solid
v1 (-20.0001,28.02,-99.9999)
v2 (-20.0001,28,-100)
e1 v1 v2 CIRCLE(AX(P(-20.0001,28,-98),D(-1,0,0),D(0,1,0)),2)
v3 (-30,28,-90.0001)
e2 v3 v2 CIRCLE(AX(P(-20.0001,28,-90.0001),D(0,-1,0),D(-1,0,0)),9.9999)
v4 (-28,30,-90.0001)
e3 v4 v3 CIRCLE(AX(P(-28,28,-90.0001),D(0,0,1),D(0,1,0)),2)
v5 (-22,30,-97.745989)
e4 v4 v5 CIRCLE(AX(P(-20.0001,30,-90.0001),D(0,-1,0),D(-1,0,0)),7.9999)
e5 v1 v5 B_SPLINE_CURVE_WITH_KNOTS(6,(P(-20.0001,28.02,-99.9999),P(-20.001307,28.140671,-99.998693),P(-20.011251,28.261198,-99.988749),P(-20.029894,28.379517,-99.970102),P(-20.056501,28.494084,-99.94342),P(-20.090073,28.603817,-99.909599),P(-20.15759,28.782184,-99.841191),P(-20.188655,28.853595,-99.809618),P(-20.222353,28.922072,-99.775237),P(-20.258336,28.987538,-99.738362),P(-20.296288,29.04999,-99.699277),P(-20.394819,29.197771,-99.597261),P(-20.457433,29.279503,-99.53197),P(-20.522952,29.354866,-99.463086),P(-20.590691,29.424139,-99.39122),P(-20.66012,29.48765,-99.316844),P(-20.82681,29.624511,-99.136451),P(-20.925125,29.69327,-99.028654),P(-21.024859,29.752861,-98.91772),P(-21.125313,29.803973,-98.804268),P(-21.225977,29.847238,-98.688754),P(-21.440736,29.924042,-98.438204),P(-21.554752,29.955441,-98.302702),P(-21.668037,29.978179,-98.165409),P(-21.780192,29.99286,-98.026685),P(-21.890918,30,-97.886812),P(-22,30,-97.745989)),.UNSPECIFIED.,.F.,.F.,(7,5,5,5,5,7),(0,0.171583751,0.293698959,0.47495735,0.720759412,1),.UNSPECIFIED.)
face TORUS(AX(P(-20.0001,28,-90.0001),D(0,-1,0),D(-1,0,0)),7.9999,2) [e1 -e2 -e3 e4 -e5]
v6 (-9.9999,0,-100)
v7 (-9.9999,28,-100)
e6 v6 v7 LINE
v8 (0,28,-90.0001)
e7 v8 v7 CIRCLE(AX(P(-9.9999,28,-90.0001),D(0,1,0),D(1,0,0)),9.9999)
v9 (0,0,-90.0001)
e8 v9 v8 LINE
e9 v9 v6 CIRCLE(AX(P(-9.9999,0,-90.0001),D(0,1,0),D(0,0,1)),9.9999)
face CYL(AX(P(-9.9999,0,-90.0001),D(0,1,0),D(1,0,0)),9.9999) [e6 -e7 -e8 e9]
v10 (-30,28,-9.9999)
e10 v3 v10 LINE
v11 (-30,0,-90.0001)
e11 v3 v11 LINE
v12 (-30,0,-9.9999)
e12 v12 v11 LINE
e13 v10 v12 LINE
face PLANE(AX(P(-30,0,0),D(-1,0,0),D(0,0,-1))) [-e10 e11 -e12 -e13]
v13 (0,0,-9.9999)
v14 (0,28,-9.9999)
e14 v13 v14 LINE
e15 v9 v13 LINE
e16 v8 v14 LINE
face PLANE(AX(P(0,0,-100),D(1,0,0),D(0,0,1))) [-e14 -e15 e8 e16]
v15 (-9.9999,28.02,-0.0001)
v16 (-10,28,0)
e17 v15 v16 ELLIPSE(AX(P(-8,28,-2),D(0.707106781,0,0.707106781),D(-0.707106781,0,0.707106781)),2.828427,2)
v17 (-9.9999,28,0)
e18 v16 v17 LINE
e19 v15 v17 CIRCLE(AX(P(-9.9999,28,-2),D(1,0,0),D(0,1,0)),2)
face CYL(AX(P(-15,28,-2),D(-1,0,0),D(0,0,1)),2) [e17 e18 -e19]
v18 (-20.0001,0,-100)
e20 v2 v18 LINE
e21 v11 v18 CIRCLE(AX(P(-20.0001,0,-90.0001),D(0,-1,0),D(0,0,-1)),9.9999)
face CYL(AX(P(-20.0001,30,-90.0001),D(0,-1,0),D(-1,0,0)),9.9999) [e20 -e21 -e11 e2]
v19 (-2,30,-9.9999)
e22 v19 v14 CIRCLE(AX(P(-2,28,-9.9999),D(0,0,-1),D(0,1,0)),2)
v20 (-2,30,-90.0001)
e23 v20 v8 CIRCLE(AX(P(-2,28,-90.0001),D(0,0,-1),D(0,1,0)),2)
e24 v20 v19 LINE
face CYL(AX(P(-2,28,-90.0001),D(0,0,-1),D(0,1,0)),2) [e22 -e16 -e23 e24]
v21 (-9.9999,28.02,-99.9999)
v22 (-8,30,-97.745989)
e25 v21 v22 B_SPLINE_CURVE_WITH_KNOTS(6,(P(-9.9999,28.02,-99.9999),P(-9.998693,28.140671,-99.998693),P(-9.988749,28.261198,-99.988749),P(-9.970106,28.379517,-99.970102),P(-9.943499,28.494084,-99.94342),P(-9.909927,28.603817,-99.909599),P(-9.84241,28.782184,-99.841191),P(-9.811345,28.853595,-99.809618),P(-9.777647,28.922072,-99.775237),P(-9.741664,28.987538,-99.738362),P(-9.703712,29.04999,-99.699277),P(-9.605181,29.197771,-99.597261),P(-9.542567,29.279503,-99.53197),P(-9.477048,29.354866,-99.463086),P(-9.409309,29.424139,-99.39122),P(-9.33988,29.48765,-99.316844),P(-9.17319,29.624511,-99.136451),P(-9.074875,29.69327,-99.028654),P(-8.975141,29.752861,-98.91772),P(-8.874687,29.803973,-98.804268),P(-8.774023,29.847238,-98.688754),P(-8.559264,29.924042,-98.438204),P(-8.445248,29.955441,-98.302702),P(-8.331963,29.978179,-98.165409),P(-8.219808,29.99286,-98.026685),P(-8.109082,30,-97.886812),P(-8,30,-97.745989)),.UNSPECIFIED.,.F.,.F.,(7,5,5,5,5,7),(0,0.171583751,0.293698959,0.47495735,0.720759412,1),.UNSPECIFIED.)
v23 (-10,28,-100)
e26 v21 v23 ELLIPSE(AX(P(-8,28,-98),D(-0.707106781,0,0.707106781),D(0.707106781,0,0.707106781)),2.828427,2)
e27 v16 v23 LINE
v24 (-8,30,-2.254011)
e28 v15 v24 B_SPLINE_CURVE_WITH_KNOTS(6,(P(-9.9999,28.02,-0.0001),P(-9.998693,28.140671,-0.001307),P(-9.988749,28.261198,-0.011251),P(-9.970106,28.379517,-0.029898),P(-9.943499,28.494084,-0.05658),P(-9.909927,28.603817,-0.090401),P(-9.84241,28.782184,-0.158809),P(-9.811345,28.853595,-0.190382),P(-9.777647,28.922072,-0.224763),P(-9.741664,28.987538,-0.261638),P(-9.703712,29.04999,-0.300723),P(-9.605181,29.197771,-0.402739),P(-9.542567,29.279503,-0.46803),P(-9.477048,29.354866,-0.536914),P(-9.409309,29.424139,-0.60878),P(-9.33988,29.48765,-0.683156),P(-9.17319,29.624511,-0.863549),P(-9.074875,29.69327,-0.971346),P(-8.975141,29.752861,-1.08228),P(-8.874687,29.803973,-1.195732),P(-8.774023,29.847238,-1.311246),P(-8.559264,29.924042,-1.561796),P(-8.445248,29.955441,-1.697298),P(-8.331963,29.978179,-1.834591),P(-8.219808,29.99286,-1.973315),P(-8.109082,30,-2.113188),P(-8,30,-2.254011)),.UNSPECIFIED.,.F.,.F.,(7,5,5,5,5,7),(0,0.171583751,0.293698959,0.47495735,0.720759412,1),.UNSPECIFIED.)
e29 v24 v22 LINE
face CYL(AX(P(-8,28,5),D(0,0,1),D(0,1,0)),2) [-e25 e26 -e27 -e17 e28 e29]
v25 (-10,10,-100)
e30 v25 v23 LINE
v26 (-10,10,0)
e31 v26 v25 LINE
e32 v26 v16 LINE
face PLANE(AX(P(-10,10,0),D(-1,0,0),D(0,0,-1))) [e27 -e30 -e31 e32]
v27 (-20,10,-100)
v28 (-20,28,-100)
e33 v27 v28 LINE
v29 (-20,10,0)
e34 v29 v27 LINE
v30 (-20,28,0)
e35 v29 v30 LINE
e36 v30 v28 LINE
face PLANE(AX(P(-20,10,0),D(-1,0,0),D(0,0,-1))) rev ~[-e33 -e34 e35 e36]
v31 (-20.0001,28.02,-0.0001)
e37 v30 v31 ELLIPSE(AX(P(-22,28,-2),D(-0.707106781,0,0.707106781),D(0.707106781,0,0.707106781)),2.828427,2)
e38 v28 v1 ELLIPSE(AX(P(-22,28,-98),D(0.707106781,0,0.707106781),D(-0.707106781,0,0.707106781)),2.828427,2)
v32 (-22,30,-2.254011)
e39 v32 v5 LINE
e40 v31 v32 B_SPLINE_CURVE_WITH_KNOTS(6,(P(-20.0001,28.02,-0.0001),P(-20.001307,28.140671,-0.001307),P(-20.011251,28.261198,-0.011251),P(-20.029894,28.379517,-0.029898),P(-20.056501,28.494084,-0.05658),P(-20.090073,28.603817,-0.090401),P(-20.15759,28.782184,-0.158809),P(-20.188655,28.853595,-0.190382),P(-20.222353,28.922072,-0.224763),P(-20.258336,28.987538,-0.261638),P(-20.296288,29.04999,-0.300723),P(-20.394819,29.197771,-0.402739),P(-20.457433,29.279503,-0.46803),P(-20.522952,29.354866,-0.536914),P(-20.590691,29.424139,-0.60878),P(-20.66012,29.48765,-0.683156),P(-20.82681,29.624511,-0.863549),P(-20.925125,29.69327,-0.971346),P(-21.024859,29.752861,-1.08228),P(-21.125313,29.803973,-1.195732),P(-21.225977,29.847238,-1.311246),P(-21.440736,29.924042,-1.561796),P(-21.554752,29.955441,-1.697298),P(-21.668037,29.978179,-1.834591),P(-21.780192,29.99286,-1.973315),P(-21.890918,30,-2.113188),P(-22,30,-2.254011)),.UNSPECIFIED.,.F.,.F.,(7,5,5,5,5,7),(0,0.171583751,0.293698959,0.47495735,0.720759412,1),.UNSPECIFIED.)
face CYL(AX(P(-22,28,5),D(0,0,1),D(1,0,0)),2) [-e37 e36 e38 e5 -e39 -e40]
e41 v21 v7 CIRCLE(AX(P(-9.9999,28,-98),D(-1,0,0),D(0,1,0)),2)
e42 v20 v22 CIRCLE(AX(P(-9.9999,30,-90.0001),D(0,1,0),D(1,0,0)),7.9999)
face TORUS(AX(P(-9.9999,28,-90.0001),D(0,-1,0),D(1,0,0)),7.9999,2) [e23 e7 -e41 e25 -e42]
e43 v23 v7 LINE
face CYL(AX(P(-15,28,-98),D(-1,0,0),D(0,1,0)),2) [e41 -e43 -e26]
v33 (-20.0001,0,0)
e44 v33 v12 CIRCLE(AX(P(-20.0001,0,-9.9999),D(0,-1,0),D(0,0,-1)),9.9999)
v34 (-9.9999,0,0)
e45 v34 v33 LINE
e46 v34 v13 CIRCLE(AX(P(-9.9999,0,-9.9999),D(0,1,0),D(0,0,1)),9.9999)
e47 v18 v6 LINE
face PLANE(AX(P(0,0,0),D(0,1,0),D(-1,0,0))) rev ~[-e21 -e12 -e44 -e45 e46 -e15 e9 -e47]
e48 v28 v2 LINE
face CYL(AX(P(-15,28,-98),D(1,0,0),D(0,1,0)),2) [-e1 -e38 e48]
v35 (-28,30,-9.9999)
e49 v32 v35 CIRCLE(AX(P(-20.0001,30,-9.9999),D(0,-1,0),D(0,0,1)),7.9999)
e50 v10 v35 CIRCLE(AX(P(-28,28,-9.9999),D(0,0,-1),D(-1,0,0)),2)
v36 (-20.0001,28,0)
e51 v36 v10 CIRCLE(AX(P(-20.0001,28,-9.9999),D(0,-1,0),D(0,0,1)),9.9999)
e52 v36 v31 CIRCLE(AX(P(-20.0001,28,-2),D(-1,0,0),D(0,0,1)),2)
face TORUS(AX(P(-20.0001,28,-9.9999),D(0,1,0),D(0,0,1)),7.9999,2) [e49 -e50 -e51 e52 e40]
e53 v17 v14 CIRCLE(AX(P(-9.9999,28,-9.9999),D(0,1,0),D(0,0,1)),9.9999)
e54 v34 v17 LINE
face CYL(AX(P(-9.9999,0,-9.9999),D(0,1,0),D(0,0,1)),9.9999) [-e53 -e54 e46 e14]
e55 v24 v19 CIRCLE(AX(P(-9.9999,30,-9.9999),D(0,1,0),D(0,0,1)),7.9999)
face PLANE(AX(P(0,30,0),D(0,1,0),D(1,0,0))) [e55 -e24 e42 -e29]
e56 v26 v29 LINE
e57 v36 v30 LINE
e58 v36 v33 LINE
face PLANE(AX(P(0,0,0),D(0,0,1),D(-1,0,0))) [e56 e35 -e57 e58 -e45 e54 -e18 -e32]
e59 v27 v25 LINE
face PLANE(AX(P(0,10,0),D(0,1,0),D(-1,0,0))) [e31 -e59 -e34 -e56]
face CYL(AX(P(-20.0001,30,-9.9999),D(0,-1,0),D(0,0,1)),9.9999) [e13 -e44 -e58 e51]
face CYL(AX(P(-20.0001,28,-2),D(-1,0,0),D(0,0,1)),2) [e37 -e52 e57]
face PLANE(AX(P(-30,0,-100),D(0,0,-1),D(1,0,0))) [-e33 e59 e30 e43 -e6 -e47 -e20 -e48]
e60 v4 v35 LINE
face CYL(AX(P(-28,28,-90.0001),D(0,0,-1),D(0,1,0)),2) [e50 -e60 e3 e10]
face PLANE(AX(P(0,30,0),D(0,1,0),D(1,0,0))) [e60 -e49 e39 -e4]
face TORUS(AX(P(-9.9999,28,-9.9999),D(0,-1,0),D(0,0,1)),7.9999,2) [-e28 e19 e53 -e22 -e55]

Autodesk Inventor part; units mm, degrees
ref_plane "YZ Plane" through (0, 0, 0) normal (1, 0, 0) x (0, 1, 0)
ref_plane "XZ Plane" through (0, 0, 0) normal (0, 1, 0) x (-1, 0, 0)
ref_plane "XY Plane" through (0, 0, 0) normal (0, 0, 1) x (1, 0, 0)
sketch "Sketch1" plane through (0, 0, 0) normal (0, 1, 0) x (-1, 0, 0)
  line L0 (0, 0) -> (30, 0)
  line L1 (30, 0) -> (30, -100)
  line L2 (30, -100) -> (0, -100)
  line L3 (0, -100) -> (0, 0)
  dimension "d0" = 30
  dimension "d1" = 100
extrude "Extrusion1" add sketch "Sketch1" along normal blind 10
sketch "Sketch2" plane through (0, 10, 0) normal (0, 1, 0) x (1, 0, 0)
  line L0 (-30, 0) -> (0, 0) projected
  line L1 (0, 0) -> (-10, 0)
  line L2 (-10, 0) -> (-10, 100)
  line L3 (-10, 100) -> (0, 100)
  line L4 (0, 100) -> (0, 0)
  line L5 (-30, 0) -> (-20, 0)
  line L6 (-20, 0) -> (-20, 100)
  line L7 (-20, 100) -> (-30, 100)
  line L8 (-30, 100) -> (-30, 0)
  dimension "d4" = 10
  dimension "d5" = 100
  dimension "d6" = 10
  dimension "d7" = 100
extrude "Extrusion2" add sketch "Sketch2" along normal blind 20
sketch "Sketch3" plane through (-20, 10, 0) normal (1, 0, 0) x (0, 0, -1)
  line L0 (100, 20) -> (0, 20) construction
  line L1 (50, 20) -> (50, 0) construction
  line L2 (0, 0) -> (100, 0) construction
  point P0 (0, -10)
fillet "Fillet1" radius 10 4 edges at (0, 15, 0) (-30, 15, 0) (0, 15, -100) (-30, 15, -100)
fillet "Fillet2" radius 2 8 edges at (-27.0711, 30, -2.9289) (-27.0711, 30, -97.0711) (-30, 30, -50) (-20, 30, -50) (-10, 30, -50) (-2.9289, 30, -97.0711) (-2.9289, 30, -2.9289) (0, 30, -50)
properties part number "TSU_Middle_Top_Clamp"
